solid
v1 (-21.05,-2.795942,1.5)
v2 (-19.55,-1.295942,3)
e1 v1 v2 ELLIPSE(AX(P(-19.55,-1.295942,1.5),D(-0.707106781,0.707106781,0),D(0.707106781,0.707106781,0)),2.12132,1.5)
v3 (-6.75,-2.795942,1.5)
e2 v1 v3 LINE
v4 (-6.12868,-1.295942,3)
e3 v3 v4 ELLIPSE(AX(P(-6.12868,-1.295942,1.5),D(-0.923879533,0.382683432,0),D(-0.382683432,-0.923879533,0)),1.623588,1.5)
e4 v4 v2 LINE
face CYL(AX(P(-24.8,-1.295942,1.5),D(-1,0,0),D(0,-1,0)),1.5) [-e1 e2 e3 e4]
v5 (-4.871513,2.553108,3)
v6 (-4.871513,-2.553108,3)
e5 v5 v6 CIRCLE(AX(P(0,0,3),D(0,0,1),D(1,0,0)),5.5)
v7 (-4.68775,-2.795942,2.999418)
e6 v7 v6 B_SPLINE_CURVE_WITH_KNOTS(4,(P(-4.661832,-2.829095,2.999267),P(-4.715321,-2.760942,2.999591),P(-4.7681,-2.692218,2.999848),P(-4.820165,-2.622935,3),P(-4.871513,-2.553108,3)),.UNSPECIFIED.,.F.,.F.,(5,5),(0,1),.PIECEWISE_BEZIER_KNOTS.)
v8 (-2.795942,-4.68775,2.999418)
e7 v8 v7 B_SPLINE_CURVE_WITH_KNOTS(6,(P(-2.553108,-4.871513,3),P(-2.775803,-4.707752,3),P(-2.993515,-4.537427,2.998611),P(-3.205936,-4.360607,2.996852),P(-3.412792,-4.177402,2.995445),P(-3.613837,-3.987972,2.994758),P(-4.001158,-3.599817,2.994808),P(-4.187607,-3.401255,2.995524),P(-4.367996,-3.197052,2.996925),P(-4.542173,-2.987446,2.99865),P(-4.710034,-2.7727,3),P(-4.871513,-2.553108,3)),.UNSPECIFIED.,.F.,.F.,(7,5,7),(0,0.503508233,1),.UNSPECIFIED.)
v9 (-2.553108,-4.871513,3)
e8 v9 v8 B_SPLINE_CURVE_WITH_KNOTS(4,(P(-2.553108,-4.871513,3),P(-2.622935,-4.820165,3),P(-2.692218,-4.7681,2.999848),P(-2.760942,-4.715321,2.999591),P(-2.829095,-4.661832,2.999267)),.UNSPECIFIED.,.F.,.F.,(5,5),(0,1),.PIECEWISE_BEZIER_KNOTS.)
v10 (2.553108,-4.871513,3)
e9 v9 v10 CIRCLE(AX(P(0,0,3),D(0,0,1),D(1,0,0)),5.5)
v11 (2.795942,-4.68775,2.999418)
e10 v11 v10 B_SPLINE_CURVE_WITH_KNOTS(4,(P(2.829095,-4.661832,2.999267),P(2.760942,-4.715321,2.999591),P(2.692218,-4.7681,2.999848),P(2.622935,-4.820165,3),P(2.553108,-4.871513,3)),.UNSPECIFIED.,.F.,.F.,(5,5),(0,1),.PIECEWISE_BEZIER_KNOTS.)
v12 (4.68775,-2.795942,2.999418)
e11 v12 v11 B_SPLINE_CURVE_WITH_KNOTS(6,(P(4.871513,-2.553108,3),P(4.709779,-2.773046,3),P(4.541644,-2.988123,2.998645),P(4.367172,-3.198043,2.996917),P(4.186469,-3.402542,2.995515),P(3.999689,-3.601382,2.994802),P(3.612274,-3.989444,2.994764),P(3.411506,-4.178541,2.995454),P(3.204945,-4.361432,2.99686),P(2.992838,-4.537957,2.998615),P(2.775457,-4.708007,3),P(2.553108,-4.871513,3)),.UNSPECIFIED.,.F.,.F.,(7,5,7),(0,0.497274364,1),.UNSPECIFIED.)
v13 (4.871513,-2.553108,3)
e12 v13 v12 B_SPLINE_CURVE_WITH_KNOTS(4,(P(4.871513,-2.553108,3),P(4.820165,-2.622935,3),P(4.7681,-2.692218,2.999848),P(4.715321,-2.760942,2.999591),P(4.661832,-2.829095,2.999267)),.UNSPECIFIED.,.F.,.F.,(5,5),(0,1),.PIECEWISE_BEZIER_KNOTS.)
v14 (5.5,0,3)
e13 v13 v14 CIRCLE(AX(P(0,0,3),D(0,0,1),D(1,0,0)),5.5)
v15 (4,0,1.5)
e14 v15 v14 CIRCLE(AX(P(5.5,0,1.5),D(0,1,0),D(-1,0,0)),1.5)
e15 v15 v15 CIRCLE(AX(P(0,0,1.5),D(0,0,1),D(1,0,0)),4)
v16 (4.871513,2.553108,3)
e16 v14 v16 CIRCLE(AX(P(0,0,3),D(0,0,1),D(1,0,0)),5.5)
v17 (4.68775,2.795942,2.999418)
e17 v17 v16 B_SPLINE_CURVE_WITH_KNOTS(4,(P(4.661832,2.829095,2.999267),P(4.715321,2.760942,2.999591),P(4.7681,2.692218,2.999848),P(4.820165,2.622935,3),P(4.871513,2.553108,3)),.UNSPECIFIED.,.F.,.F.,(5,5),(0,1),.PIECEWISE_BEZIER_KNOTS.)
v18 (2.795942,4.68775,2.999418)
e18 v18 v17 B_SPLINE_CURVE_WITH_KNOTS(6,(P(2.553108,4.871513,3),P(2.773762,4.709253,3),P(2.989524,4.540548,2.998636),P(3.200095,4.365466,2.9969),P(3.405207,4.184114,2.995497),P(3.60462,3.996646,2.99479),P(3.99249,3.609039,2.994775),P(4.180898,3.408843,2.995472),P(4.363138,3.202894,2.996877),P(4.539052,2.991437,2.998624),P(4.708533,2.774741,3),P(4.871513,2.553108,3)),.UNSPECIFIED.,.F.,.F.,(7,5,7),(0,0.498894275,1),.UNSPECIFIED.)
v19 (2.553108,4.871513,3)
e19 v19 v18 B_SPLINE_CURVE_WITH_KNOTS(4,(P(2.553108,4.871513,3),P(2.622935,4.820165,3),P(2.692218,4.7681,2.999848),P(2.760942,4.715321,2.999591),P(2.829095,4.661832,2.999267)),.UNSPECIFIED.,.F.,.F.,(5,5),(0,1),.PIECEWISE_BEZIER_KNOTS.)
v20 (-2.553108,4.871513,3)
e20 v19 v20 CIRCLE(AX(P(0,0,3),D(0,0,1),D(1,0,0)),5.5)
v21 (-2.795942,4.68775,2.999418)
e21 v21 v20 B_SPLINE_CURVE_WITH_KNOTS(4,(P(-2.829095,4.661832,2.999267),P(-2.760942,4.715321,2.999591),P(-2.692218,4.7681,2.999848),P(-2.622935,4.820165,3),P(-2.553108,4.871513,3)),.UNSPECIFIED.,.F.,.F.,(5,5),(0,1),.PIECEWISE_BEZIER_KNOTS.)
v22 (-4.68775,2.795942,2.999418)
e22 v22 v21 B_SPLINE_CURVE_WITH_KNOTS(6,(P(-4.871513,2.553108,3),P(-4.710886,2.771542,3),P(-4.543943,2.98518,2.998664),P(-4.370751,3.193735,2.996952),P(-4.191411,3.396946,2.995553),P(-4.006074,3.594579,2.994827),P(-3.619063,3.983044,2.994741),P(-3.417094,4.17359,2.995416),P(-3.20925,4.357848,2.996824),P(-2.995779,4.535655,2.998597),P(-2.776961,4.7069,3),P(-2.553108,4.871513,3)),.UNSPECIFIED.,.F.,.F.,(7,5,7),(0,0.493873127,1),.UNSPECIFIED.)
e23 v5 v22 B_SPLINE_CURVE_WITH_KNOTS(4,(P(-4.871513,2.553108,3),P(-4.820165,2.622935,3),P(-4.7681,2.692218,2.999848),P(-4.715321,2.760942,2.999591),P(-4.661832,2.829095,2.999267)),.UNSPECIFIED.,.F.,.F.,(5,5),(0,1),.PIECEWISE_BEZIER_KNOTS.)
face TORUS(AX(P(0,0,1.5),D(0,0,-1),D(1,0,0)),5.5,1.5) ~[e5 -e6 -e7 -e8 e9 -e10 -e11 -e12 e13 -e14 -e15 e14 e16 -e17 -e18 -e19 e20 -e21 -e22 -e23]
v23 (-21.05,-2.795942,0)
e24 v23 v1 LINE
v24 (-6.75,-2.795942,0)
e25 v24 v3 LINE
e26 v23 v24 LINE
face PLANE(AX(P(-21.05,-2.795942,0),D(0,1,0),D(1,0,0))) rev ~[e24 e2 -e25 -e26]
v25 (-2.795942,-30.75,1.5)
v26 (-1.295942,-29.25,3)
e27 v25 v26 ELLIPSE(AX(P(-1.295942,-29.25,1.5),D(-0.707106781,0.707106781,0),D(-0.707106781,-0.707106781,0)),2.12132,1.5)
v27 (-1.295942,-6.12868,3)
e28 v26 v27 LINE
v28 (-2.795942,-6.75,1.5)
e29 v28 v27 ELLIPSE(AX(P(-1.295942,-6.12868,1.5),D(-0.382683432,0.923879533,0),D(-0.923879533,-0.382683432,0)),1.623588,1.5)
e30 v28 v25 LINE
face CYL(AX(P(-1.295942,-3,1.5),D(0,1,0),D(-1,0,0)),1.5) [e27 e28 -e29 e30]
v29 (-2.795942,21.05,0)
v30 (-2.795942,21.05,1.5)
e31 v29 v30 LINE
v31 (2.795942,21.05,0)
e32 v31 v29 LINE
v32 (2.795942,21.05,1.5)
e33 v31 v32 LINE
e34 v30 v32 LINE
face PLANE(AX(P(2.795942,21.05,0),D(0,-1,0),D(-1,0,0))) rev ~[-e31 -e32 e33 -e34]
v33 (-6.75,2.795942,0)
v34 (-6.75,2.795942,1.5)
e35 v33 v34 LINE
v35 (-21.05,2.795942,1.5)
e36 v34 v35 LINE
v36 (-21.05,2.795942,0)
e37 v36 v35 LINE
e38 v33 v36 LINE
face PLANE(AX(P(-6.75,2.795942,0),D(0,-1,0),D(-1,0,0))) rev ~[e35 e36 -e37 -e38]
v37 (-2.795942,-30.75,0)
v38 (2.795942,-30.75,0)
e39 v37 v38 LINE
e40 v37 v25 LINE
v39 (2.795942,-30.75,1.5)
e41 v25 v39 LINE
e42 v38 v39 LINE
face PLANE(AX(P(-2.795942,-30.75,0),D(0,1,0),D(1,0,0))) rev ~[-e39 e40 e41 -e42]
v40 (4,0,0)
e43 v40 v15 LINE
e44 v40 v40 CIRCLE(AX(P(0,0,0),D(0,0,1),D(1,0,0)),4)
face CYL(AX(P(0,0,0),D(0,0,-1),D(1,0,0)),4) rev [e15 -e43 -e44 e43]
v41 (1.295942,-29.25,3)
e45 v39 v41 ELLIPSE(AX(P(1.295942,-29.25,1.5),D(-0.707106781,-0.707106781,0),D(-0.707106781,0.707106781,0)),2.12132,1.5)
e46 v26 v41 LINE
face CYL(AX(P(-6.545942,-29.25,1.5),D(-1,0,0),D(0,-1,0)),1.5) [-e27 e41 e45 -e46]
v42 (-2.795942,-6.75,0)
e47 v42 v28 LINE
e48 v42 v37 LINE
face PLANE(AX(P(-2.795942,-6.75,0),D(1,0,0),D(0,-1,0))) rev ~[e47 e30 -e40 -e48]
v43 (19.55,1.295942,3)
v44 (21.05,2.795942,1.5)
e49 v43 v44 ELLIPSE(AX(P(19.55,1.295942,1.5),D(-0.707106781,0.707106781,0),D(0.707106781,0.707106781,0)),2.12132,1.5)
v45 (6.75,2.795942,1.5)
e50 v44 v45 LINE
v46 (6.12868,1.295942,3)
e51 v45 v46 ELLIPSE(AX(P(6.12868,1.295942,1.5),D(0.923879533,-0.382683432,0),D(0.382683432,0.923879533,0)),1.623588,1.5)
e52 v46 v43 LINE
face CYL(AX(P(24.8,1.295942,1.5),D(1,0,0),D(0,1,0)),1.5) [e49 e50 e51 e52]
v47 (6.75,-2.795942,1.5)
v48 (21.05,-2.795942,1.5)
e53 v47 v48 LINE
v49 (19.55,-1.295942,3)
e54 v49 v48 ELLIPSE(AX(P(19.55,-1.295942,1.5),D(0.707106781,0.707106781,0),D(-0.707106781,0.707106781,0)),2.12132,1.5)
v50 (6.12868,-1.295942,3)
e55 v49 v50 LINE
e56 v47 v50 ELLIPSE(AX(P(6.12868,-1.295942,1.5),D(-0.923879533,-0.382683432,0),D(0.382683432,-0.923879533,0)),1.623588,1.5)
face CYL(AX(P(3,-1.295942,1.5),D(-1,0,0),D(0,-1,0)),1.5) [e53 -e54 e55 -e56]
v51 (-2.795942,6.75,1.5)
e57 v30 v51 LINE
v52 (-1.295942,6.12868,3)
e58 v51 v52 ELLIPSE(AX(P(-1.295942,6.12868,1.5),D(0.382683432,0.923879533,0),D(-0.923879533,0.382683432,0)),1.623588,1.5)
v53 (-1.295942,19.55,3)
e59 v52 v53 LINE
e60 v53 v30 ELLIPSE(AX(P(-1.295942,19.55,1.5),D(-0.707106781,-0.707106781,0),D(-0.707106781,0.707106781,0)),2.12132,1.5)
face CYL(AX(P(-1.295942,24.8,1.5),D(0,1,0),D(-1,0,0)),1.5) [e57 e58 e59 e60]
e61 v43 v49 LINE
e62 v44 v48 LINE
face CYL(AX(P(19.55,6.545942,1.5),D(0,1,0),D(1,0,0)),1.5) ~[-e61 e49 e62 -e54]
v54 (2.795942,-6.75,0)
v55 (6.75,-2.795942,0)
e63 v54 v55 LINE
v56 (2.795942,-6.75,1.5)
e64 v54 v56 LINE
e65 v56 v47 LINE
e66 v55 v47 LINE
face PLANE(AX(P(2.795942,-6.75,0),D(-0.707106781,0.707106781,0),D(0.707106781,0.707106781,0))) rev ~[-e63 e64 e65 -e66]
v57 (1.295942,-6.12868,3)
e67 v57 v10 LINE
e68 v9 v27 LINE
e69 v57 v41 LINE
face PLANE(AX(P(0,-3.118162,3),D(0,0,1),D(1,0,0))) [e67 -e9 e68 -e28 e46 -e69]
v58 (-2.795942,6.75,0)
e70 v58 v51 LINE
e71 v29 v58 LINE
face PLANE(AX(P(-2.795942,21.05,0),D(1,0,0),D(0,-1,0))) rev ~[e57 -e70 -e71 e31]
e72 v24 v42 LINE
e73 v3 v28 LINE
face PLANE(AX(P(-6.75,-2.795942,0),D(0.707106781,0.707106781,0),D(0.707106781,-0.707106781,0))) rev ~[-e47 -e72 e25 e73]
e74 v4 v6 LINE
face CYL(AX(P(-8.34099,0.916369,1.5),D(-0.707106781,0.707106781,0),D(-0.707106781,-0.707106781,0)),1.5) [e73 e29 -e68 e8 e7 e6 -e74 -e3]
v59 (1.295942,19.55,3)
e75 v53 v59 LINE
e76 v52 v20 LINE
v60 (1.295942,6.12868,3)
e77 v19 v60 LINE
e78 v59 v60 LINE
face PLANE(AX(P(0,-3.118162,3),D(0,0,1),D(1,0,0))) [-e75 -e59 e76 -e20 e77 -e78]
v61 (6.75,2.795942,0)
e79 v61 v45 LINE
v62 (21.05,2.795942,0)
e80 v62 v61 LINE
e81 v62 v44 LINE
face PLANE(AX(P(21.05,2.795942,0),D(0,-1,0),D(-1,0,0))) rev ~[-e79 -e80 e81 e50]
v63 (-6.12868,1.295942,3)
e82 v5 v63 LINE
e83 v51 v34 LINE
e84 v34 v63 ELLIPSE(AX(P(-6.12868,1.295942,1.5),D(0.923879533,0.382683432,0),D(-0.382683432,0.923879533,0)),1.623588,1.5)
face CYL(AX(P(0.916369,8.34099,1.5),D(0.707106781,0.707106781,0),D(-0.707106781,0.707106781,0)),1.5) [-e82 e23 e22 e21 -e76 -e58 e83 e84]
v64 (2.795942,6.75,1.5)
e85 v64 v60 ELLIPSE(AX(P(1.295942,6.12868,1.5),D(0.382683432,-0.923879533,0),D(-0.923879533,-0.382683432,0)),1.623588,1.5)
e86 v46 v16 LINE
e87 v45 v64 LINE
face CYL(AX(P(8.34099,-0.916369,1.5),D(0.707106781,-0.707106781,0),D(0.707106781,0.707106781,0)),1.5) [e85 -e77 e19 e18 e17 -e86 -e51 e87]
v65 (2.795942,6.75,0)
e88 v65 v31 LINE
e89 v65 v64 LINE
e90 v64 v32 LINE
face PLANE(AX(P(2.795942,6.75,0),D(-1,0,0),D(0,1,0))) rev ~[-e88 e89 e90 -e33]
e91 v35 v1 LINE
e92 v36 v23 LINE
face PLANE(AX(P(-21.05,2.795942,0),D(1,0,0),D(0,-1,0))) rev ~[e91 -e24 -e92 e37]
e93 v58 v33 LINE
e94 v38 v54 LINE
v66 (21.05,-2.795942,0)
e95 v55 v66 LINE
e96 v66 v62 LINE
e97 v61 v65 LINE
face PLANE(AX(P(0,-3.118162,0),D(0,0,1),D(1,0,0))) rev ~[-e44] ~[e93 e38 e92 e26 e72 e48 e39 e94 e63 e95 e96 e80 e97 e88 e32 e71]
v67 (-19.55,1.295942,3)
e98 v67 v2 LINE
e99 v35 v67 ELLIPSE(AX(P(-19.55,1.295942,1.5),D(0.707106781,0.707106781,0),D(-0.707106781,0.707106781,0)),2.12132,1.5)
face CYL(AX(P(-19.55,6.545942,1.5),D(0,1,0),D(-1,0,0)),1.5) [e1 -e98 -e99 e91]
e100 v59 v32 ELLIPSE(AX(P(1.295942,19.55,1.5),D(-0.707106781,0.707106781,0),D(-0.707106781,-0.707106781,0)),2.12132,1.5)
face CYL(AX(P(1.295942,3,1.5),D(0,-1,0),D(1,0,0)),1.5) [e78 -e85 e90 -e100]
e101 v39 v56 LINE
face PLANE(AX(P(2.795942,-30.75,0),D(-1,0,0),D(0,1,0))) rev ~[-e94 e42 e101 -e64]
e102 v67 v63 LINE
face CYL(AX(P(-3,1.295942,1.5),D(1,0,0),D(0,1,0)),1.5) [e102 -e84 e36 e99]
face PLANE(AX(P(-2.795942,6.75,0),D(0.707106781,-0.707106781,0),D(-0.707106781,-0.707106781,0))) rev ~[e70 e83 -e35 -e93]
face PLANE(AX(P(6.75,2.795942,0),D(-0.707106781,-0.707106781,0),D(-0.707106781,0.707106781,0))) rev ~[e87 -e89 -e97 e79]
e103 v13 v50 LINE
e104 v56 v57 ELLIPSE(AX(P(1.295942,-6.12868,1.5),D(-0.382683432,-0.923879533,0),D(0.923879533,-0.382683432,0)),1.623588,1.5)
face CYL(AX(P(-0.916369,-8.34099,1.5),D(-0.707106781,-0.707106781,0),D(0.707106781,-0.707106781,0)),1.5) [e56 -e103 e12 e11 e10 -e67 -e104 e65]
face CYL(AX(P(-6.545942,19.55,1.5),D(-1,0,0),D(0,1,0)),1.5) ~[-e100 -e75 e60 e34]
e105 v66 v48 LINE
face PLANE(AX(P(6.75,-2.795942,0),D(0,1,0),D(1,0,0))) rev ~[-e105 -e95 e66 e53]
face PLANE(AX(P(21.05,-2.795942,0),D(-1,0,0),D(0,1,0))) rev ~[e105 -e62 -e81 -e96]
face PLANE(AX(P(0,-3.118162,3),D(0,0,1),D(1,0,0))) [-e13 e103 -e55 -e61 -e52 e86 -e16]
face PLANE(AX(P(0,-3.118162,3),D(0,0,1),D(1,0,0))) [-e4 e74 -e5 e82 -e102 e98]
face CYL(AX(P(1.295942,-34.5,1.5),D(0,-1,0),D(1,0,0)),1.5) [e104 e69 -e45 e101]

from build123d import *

# Parameters (mm, degrees)
F0_R          = 4
F1_DEPTH      = 3
F2_T1_DEPTH   = 13.091883092
F2_T3_DEPTH   = 13.091883092
F2_T8_DEPTH   = 21.8
F2_T13_DEPTH  = 31.5
F2_T18_DEPTH  = 13.091883092
F2_T24_DEPTH  = 21.8
F2_T29_DEPTH  = 21.8
F2_T34_DEPTH  = 31.5
F2_T39_DEPTH  = 13.091883092
F2_T45_DEPTH  = 13.091883092
F2_T51_DEPTH  = 21.8
F2_T56_DEPTH  = 21.8
F2_T61_DEPTH  = 21.8
F2_T66_DEPTH  = 13.091883092
F2_T75_DEPTH  = 13.091883092
F2_T79_DEPTH  = 21.8
F2_T86_DEPTH  = 31.5
F2_T90_DEPTH  = 13.091883092
F2_T97_DEPTH  = 13.091883092
F2_T101_DEPTH = 21.8
F2_T108_DEPTH = 21.8
F2_T112_DEPTH = 13.091883092
F2_T119_DEPTH = 13.091883092
F2_T123_DEPTH = 31.5
F2_T130_DEPTH = 21.8
F2_T134_DEPTH = 13.091883092
F2_T141_DEPTH = 21.8
F2_T145_DEPTH = 13.091883092
F2_T152_DEPTH = 21.8
F2_T156_DEPTH = 13.091883092


# Not quite as in the source:
# - a fillet or chamfer that OpenCascade refuses, or shapes differently, is made with other operations: its cross-section is extruded or revolved along the edge and cut away or added


with BuildPart() as f1:
    # F0 (on Top) → F1 (new body)
    with BuildSketch(Plane.XY):
        Polygon((-6.75, -2.795941546), (-2.795941546, -6.75), (-2.795941546, -30.75), (2.795941546, -30.75), (2.795941546, -6.75), (6.75, -2.795941546), (21.05, -2.795941546), (21.05, 2.795941546), (6.75, 2.795941546), (2.795941546, 6.75), (2.795941546, 21.05), (-2.795941546, 21.05), (-2.795941546, 6.75), (-6.75, 2.795941546), (-21.05, 2.795941546), (-21.05, -2.795941546), align=None)
        Circle(F0_R, mode=Mode.SUBTRACT)
    extrude(amount=F1_DEPTH)

    # F2: fillet of radius 1.5 on 17 edges, made by hand

    # F2_s2 → F2_t1 (cut)
    with BuildSketch(Plane.XZ.offset(-6.545941546)):
        with BuildLine():
            ThreePointArc((-21.05, 1.5), (-20.6106601718, 2.5606601718), (-19.55, 3))
            Line((-19.55, 3), (-21.05, 3))
            Line((-21.05, 3), (-21.05, 1.5))
        make_face()
        with BuildLine():
            ThreePointArc((21.05, 1.5), (20.6106601718, 2.5606601718), (19.55, 3))
            Line((19.55, 3), (21.05, 3))
            Line((21.05, 3), (21.05, 1.5))
        make_face()
    extrude(amount=F2_T1_DEPTH, mode=Mode.SUBTRACT)

    # F2_s4 → F2_t3 (cut)
    with BuildSketch(Plane.YZ.offset(-6.545941546)):
        with BuildLine():
            ThreePointArc((-30.75, 1.5), (-30.3106601718, 2.5606601718), (-29.25, 3))
            Line((-29.25, 3), (-30.75, 3))
            Line((-30.75, 3), (-30.75, 1.5))
        make_face()
        with BuildLine():
            ThreePointArc((21.05, 1.5), (20.6106601718, 2.5606601718), (19.55, 3))
            Line((19.55, 3), (21.05, 3))
            Line((21.05, 3), (21.05, 1.5))
        make_face()
    extrude(amount=F2_T3_DEPTH, mode=Mode.SUBTRACT)


with BuildPart() as f2_tool6:
    # F2_s7 → F2_t8 (new body)
    with BuildSketch(Plane.YZ.offset(-3)):
        with BuildLine():
            ThreePointArc((2.795941546, 1.5), (2.3566017178, 2.5606601718), (1.295941546, 3))
            Line((1.295941546, 3), (2.795941546, 3))
            Line((2.795941546, 3), (2.795941546, 1.5))
        make_face()
    extrude(amount=-F2_T8_DEPTH)

    split(bisect_by=Plane(origin=(-4.772970773, 4.772970773, 0), x_dir=(0, 0, 1), z_dir=(-0.7071067812, 0.7071067812, 0)), keep=Keep.TOP)


with BuildPart() as f1_1:
    add(f1.part)

    # F2_t5: cut F2_tool6
    add(f2_tool6.part, mode=Mode.SUBTRACT)


with BuildPart() as f2_tool11:
    # F2_s12 → F2_t13 (new body)
    with BuildSketch(Plane.XZ.offset(34.5)):
        with BuildLine():
            ThreePointArc((2.795941546, 1.5), (2.3566017178, 2.5606601718), (1.295941546, 3))
            Line((1.295941546, 3), (2.795941546, 3))
            Line((2.795941546, 3), (2.795941546, 1.5))
        make_face()
    extrude(amount=-F2_T13_DEPTH)

    split(bisect_by=Plane(origin=(4.772970773, -4.772970773, 0), x_dir=(0, 0, 1), z_dir=(0.7071067812, -0.7071067812, 0)), keep=Keep.TOP)


with BuildPart() as f1_2:
    add(f1_1.part)

    # F2_t10: cut F2_tool11
    add(f2_tool11.part, mode=Mode.SUBTRACT)


with BuildPart() as f2_tool16:
    # F2_s17 → F2_t18 (new body)
    with BuildSketch(Plane(origin=(-4.6286796564, -4.6286796564, 0), x_dir=(0, 0, 1), z_dir=(0.7071067812, 0.7071067812, 0))):
        with BuildLine():
            ThreePointArc((1.5, 6.75), (2.5606601718, 6.3106601718), (3, 5.25))
            Line((3, 5.25), (3, 6.75))
            Line((3, 6.75), (1.5, 6.75))
        make_face()
    extrude(amount=F2_T18_DEPTH)

    split(bisect_by=Plane.YZ.offset(2.795941546), keep=Keep.TOP)

    split(bisect_by=Plane.XZ.offset(2.795941546), keep=Keep.TOP)


with BuildPart() as f1_3:
    add(f1_2.part)

    # F2_t15: cut F2_tool16
    add(f2_tool16.part, mode=Mode.SUBTRACT)


with BuildPart() as f2_tool22:
    # F2_s23 → F2_t24 (new body)
    with BuildSketch(Plane.YZ.offset(3)):
        with BuildLine():
            ThreePointArc((-2.795941546, 1.5), (-2.3566017178, 2.5606601718), (-1.295941546, 3))
            Line((-1.295941546, 3), (-2.795941546, 3))
            Line((-2.795941546, 3), (-2.795941546, 1.5))
        make_face()
    extrude(amount=F2_T24_DEPTH)

    split(bisect_by=Plane(origin=(4.772970773, -4.772970773, 0), x_dir=(0, 0, 1), z_dir=(0.7071067812, -0.7071067812, 0)), keep=Keep.TOP)


with BuildPart() as f1_4:
    add(f1_3.part)

    # F2_t21: cut F2_tool22
    add(f2_tool22.part, mode=Mode.SUBTRACT)


with BuildPart() as f2_tool27:
    # F2_s28 → F2_t29 (new body)
    with BuildSketch(Plane.YZ.offset(-24.8)):
        with BuildLine():
            ThreePointArc((-2.795941546, 1.5), (-2.3566017178, 2.5606601718), (-1.295941546, 3))
            Line((-1.295941546, 3), (-2.795941546, 3))
            Line((-2.795941546, 3), (-2.795941546, 1.5))
        make_face()
    extrude(amount=F2_T29_DEPTH)

    split(bisect_by=Plane(origin=(-4.772970773, -4.772970773, 0), x_dir=(0, 0, 1), z_dir=(-0.7071067812, -0.7071067812, 0)), keep=Keep.TOP)


with BuildPart() as f1_5:
    add(f1_4.part)

    # F2_t26: cut F2_tool27
    add(f2_tool27.part, mode=Mode.SUBTRACT)


with BuildPart() as f2_tool32:
    # F2_s33 → F2_t34 (new body)
    with BuildSketch(Plane.XZ.offset(3)):
        with BuildLine():
            ThreePointArc((-2.795941546, 1.5), (-2.3566017178, 2.5606601718), (-1.295941546, 3))
            Line((-1.295941546, 3), (-2.795941546, 3))
            Line((-2.795941546, 3), (-2.795941546, 1.5))
        make_face()
    extrude(amount=F2_T34_DEPTH)

    split(bisect_by=Plane(origin=(-4.772970773, -4.772970773, 0), x_dir=(0, 0, 1), z_dir=(-0.7071067812, -0.7071067812, 0)), keep=Keep.TOP)


with BuildPart() as f1_6:
    add(f1_5.part)

    # F2_t31: cut F2_tool32
    add(f2_tool32.part, mode=Mode.SUBTRACT)


with BuildPart() as f2_tool37:
    # F2_s38 → F2_t39 (new body)
    with BuildSketch(Plane(origin=(-4.6286796564, 4.6286796564, 0), x_dir=(0, 0, 1), z_dir=(0.7071067812, -0.7071067812, 0))):
        with BuildLine():
            ThreePointArc((1.5, 6.75), (2.5606601718, 6.3106601718), (3, 5.25))
            Line((3, 5.25), (3, 6.75))
            Line((3, 6.75), (1.5, 6.75))
        make_face()
    extrude(amount=F2_T39_DEPTH)

    split(bisect_by=Plane.XZ.offset(2.795941546), keep=Keep.TOP)

    split(bisect_by=Plane.YZ.offset(-2.795941546), keep=Keep.BOTTOM)


with BuildPart() as f1_7:
    add(f1_6.part)

    # F2_t36: cut F2_tool37
    add(f2_tool37.part, mode=Mode.SUBTRACT)


with BuildPart() as f2_tool43:
    # F2_s44 → F2_t45 (new body)
    with BuildSketch(Plane(origin=(4.6286796564, 4.6286796564, 0), x_dir=(0, 0, 1), z_dir=(-0.7071067812, -0.7071067812, 0))):
        with BuildLine():
            ThreePointArc((1.5, 6.75), (2.5606601718, 6.3106601718), (3, 5.25))
            Line((3, 5.25), (3, 6.75))
            Line((3, 6.75), (1.5, 6.75))
        make_face()
    extrude(amount=F2_T45_DEPTH)

    split(bisect_by=Plane.YZ.offset(-2.795941546), keep=Keep.BOTTOM)

    split(bisect_by=Plane.XZ.offset(-2.795941546), keep=Keep.BOTTOM)


with BuildPart() as f1_8:
    add(f1_7.part)

    # F2_t42: cut F2_tool43
    add(f2_tool43.part, mode=Mode.SUBTRACT)


with BuildPart() as f2_tool49:
    # F2_s50 → F2_t51 (new body)
    with BuildSketch(Plane.XZ.offset(-24.8)):
        with BuildLine():
            ThreePointArc((-2.795941546, 1.5), (-2.3566017178, 2.5606601718), (-1.295941546, 3))
            Line((-1.295941546, 3), (-2.795941546, 3))
            Line((-2.795941546, 3), (-2.795941546, 1.5))
        make_face()
    extrude(amount=F2_T51_DEPTH)

    split(bisect_by=Plane(origin=(-4.772970773, 4.772970773, 0), x_dir=(0, 0, 1), z_dir=(-0.7071067812, 0.7071067812, 0)), keep=Keep.TOP)


with BuildPart() as f1_9:
    add(f1_8.part)

    # F2_t48: cut F2_tool49
    add(f2_tool49.part, mode=Mode.SUBTRACT)


with BuildPart() as f2_tool54:
    # F2_s55 → F2_t56 (new body)
    with BuildSketch(Plane.XZ.offset(-3)):
        with BuildLine():
            ThreePointArc((2.795941546, 1.5), (2.3566017178, 2.5606601718), (1.295941546, 3))
            Line((1.295941546, 3), (2.795941546, 3))
            Line((2.795941546, 3), (2.795941546, 1.5))
        make_face()
    extrude(amount=-F2_T56_DEPTH)

    split(bisect_by=Plane(origin=(4.772970773, 4.772970773, 0), x_dir=(0, 0, 1), z_dir=(0.7071067812, 0.7071067812, 0)), keep=Keep.TOP)


with BuildPart() as f1_10:
    add(f1_9.part)

    # F2_t53: cut F2_tool54
    add(f2_tool54.part, mode=Mode.SUBTRACT)


with BuildPart() as f2_tool59:
    # F2_s60 → F2_t61 (new body)
    with BuildSketch(Plane.YZ.offset(24.8)):
        with BuildLine():
            ThreePointArc((2.795941546, 1.5), (2.3566017178, 2.5606601718), (1.295941546, 3))
            Line((1.295941546, 3), (2.795941546, 3))
            Line((2.795941546, 3), (2.795941546, 1.5))
        make_face()
    extrude(amount=-F2_T61_DEPTH)

    split(bisect_by=Plane(origin=(4.772970773, 4.772970773, 0), x_dir=(0, 0, 1), z_dir=(0.7071067812, 0.7071067812, 0)), keep=Keep.TOP)


with BuildPart() as f1_11:
    add(f1_10.part)

    # F2_t58: cut F2_tool59
    add(f2_tool59.part, mode=Mode.SUBTRACT)


with BuildPart() as f2_tool64:
    # F2_s65 → F2_t66 (new body)
    with BuildSketch(Plane(origin=(4.6286796564, -4.6286796564, 0), x_dir=(0, 0, 1), z_dir=(-0.7071067812, 0.7071067812, 0))):
        with BuildLine():
            ThreePointArc((1.5, 6.75), (2.5606601718, 6.3106601718), (3, 5.25))
            Line((3, 5.25), (3, 6.75))
            Line((3, 6.75), (1.5, 6.75))
        make_face()
    extrude(amount=F2_T66_DEPTH)

    split(bisect_by=Plane.YZ.offset(2.795941546), keep=Keep.TOP)

    split(bisect_by=Plane.XZ.offset(-2.795941546), keep=Keep.BOTTOM)


with BuildPart() as f1_12:
    add(f1_11.part)

    # F2_t63: cut F2_tool64
    add(f2_tool64.part, mode=Mode.SUBTRACT)

    # F2_s69 → F2_t70 (revolve, cut)
    with BuildSketch(Plane.XZ):
        with BuildLine():
            ThreePointArc((4, 1.5), (4.4393398282, 2.5606601718), (5.5, 3))
            Line((5.5, 3), (4, 3))
            Line((4, 3), (4, 1.5))
        make_face()
    revolve(axis=Axis((0, 0, 3), (0, 0, 1)), mode=Mode.SUBTRACT)


with BuildPart() as f2_tool73:
    # F2_s74 → F2_t75 (new body)
    with BuildSketch(Plane(origin=(4.6286796564, 4.6286796564, 0), x_dir=(0, 0, 1), z_dir=(-0.7071067812, -0.7071067812, 0))):
        with BuildLine():
            ThreePointArc((1.5, 6.75), (2.5606601718, 6.3106601718), (3, 5.25))
            Line((3, 5.25), (3, 6.75))
            Line((3, 6.75), (1.5, 6.75))
        make_face()
    extrude(amount=F2_T75_DEPTH)

    split(bisect_by=Plane.XZ.offset(-2.795941546), keep=Keep.TOP)


with BuildPart() as f2_tool77:
    # F2_s78 → F2_t79 (new body)
    with BuildSketch(Plane.YZ.offset(-3)):
        with BuildLine():
            ThreePointArc((2.795941546, 1.5), (2.3566017178, 2.5606601718), (1.295941546, 3))
            Line((1.295941546, 3), (2.795941546, 3))
            Line((2.795941546, 3), (2.795941546, 1.5))
        make_face()
    extrude(amount=-F2_T79_DEPTH)

    split(bisect_by=Plane(origin=(-4.772970773, 4.772970773, 0), x_dir=(0, 0, 1), z_dir=(0.7071067812, -0.7071067812, 0)), keep=Keep.TOP)


with BuildPart() as f2_tool73_1:
    add(f2_tool73.part)

    # F2_t81: intersect F2_tool77
    add(f2_tool77.part, mode=Mode.INTERSECT)


with BuildPart() as f1_13:
    add(f1_12.part)

    # F2_t71: cut F2_tool73
    add(f2_tool73_1.part, mode=Mode.SUBTRACT)


with BuildPart() as f2_tool84:
    # F2_s85 → F2_t86 (new body)
    with BuildSketch(Plane.XZ.offset(34.5)):
        with BuildLine():
            ThreePointArc((2.795941546, 1.5), (2.3566017178, 2.5606601718), (1.295941546, 3))
            Line((1.295941546, 3), (2.795941546, 3))
            Line((2.795941546, 3), (2.795941546, 1.5))
        make_face()
    extrude(amount=-F2_T86_DEPTH)

    split(bisect_by=Plane(origin=(4.772970773, -4.772970773, 0), x_dir=(0, 0, 1), z_dir=(-0.7071067812, 0.7071067812, 0)), keep=Keep.TOP)


with BuildPart() as f2_tool88:
    # F2_s89 → F2_t90 (new body)
    with BuildSketch(Plane(origin=(-4.6286796564, -4.6286796564, 0), x_dir=(0, 0, 1), z_dir=(0.7071067812, 0.7071067812, 0))):
        with BuildLine():
            ThreePointArc((1.5, 6.75), (2.5606601718, 6.3106601718), (3, 5.25))
            Line((3, 5.25), (3, 6.75))
            Line((3, 6.75), (1.5, 6.75))
        make_face()
    extrude(amount=F2_T90_DEPTH)

    split(bisect_by=Plane.YZ.offset(2.795941546), keep=Keep.BOTTOM)


with BuildPart() as f2_tool84_1:
    add(f2_tool84.part)

    # F2_t92: intersect F2_tool88
    add(f2_tool88.part, mode=Mode.INTERSECT)


with BuildPart() as f1_14:
    add(f1_13.part)

    # F2_t82: cut F2_tool84
    add(f2_tool84_1.part, mode=Mode.SUBTRACT)


with BuildPart() as f2_tool95:
    # F2_s96 → F2_t97 (new body)
    with BuildSketch(Plane(origin=(-4.6286796564, -4.6286796564, 0), x_dir=(0, 0, 1), z_dir=(0.7071067812, 0.7071067812, 0))):
        with BuildLine():
            ThreePointArc((1.5, 6.75), (2.5606601718, 6.3106601718), (3, 5.25))
            Line((3, 5.25), (3, 6.75))
            Line((3, 6.75), (1.5, 6.75))
        make_face()
    extrude(amount=F2_T97_DEPTH)

    split(bisect_by=Plane.XZ.offset(2.795941546), keep=Keep.BOTTOM)


with BuildPart() as f2_tool99:
    # F2_s100 → F2_t101 (new body)
    with BuildSketch(Plane.YZ.offset(3)):
        with BuildLine():
            ThreePointArc((-2.795941546, 1.5), (-2.3566017178, 2.5606601718), (-1.295941546, 3))
            Line((-1.295941546, 3), (-2.795941546, 3))
            Line((-2.795941546, 3), (-2.795941546, 1.5))
        make_face()
    extrude(amount=F2_T101_DEPTH)

    split(bisect_by=Plane(origin=(4.772970773, -4.772970773, 0), x_dir=(0, 0, 1), z_dir=(-0.7071067812, 0.7071067812, 0)), keep=Keep.TOP)


with BuildPart() as f2_tool95_1:
    add(f2_tool95.part)

    # F2_t103: intersect F2_tool99
    add(f2_tool99.part, mode=Mode.INTERSECT)


with BuildPart() as f1_15:
    add(f1_14.part)

    # F2_t93: cut F2_tool95
    add(f2_tool95_1.part, mode=Mode.SUBTRACT)


with BuildPart() as f2_tool106:
    # F2_s107 → F2_t108 (new body)
    with BuildSketch(Plane.YZ.offset(-24.8)):
        with BuildLine():
            ThreePointArc((-2.795941546, 1.5), (-2.3566017178, 2.5606601718), (-1.295941546, 3))
            Line((-1.295941546, 3), (-2.795941546, 3))
            Line((-2.795941546, 3), (-2.795941546, 1.5))
        make_face()
    extrude(amount=F2_T108_DEPTH)

    split(bisect_by=Plane(origin=(-4.772970773, -4.772970773, 0), x_dir=(0, 0, 1), z_dir=(0.7071067812, 0.7071067812, 0)), keep=Keep.TOP)


with BuildPart() as f2_tool110:
    # F2_s111 → F2_t112 (new body)
    with BuildSketch(Plane(origin=(-4.6286796564, 4.6286796564, 0), x_dir=(0, 0, 1), z_dir=(0.7071067812, -0.7071067812, 0))):
        with BuildLine():
            ThreePointArc((1.5, 6.75), (2.5606601718, 6.3106601718), (3, 5.25))
            Line((3, 5.25), (3, 6.75))
            Line((3, 6.75), (1.5, 6.75))
        make_face()
    extrude(amount=F2_T112_DEPTH)

    split(bisect_by=Plane.XZ.offset(2.795941546), keep=Keep.BOTTOM)


with BuildPart() as f2_tool106_1:
    add(f2_tool106.part)

    # F2_t114: intersect F2_tool110
    add(f2_tool110.part, mode=Mode.INTERSECT)


with BuildPart() as f1_16:
    add(f1_15.part)

    # F2_t104: cut F2_tool106
    add(f2_tool106_1.part, mode=Mode.SUBTRACT)


with BuildPart() as f2_tool117:
    # F2_s118 → F2_t119 (new body)
    with BuildSketch(Plane(origin=(-4.6286796564, 4.6286796564, 0), x_dir=(0, 0, 1), z_dir=(0.7071067812, -0.7071067812, 0))):
        with BuildLine():
            ThreePointArc((1.5, 6.75), (2.5606601718, 6.3106601718), (3, 5.25))
            Line((3, 5.25), (3, 6.75))
            Line((3, 6.75), (1.5, 6.75))
        make_face()
    extrude(amount=F2_T119_DEPTH)

    split(bisect_by=Plane.YZ.offset(-2.795941546), keep=Keep.TOP)


with BuildPart() as f2_tool121:
    # F2_s122 → F2_t123 (new body)
    with BuildSketch(Plane.XZ.offset(3)):
        with BuildLine():
            ThreePointArc((-2.795941546, 1.5), (-2.3566017178, 2.5606601718), (-1.295941546, 3))
            Line((-1.295941546, 3), (-2.795941546, 3))
            Line((-2.795941546, 3), (-2.795941546, 1.5))
        make_face()
    extrude(amount=F2_T123_DEPTH)

    split(bisect_by=Plane(origin=(-4.772970773, -4.772970773, 0), x_dir=(0, 0, 1), z_dir=(0.7071067812, 0.7071067812, 0)), keep=Keep.TOP)


with BuildPart() as f2_tool117_1:
    add(f2_tool117.part)

    # F2_t125: intersect F2_tool121
    add(f2_tool121.part, mode=Mode.INTERSECT)


with BuildPart() as f1_17:
    add(f1_16.part)

    # F2_t115: cut F2_tool117
    add(f2_tool117_1.part, mode=Mode.SUBTRACT)


with BuildPart() as f2_tool128:
    # F2_s129 → F2_t130 (new body)
    with BuildSketch(Plane.XZ.offset(-24.8)):
        with BuildLine():
            ThreePointArc((-2.795941546, 1.5), (-2.3566017178, 2.5606601718), (-1.295941546, 3))
            Line((-1.295941546, 3), (-2.795941546, 3))
            Line((-2.795941546, 3), (-2.795941546, 1.5))
        make_face()
    extrude(amount=F2_T130_DEPTH)

    split(bisect_by=Plane(origin=(-4.772970773, 4.772970773, 0), x_dir=(0, 0, 1), z_dir=(0.7071067812, -0.7071067812, 0)), keep=Keep.TOP)


with BuildPart() as f2_tool132:
    # F2_s133 → F2_t134 (new body)
    with BuildSketch(Plane(origin=(4.6286796564, 4.6286796564, 0), x_dir=(0, 0, 1), z_dir=(-0.7071067812, -0.7071067812, 0))):
        with BuildLine():
            ThreePointArc((1.5, 6.75), (2.5606601718, 6.3106601718), (3, 5.25))
            Line((3, 5.25), (3, 6.75))
            Line((3, 6.75), (1.5, 6.75))
        make_face()
    extrude(amount=F2_T134_DEPTH)

    split(bisect_by=Plane.YZ.offset(-2.795941546), keep=Keep.TOP)


with BuildPart() as f2_tool128_1:
    add(f2_tool128.part)

    # F2_t136: intersect F2_tool132
    add(f2_tool132.part, mode=Mode.INTERSECT)


with BuildPart() as f1_18:
    add(f1_17.part)

    # F2_t126: cut F2_tool128
    add(f2_tool128_1.part, mode=Mode.SUBTRACT)


with BuildPart() as f2_tool139:
    # F2_s140 → F2_t141 (new body)
    with BuildSketch(Plane.XZ.offset(-3)):
        with BuildLine():
            ThreePointArc((2.795941546, 1.5), (2.3566017178, 2.5606601718), (1.295941546, 3))
            Line((1.295941546, 3), (2.795941546, 3))
            Line((2.795941546, 3), (2.795941546, 1.5))
        make_face()
    extrude(amount=-F2_T141_DEPTH)

    split(bisect_by=Plane(origin=(4.772970773, 4.772970773, 0), x_dir=(0, 0, 1), z_dir=(-0.7071067812, -0.7071067812, 0)), keep=Keep.TOP)


with BuildPart() as f2_tool143:
    # F2_s144 → F2_t145 (new body)
    with BuildSketch(Plane(origin=(4.6286796564, -4.6286796564, 0), x_dir=(0, 0, 1), z_dir=(-0.7071067812, 0.7071067812, 0))):
        with BuildLine():
            ThreePointArc((1.5, 6.75), (2.5606601718, 6.3106601718), (3, 5.25))
            Line((3, 5.25), (3, 6.75))
            Line((3, 6.75), (1.5, 6.75))
        make_face()
    extrude(amount=F2_T145_DEPTH)

    split(bisect_by=Plane.YZ.offset(2.795941546), keep=Keep.BOTTOM)


with BuildPart() as f2_tool139_1:
    add(f2_tool139.part)

    # F2_t147: intersect F2_tool143
    add(f2_tool143.part, mode=Mode.INTERSECT)


with BuildPart() as f1_19:
    add(f1_18.part)

    # F2_t137: cut F2_tool139
    add(f2_tool139_1.part, mode=Mode.SUBTRACT)


with BuildPart() as f2_tool150:
    # F2_s151 → F2_t152 (new body)
    with BuildSketch(Plane.YZ.offset(24.8)):
        with BuildLine():
            ThreePointArc((2.795941546, 1.5), (2.3566017178, 2.5606601718), (1.295941546, 3))
            Line((1.295941546, 3), (2.795941546, 3))
            Line((2.795941546, 3), (2.795941546, 1.5))
        make_face()
    extrude(amount=-F2_T152_DEPTH)

    split(bisect_by=Plane(origin=(4.772970773, 4.772970773, 0), x_dir=(0, 0, 1), z_dir=(-0.7071067812, -0.7071067812, 0)), keep=Keep.TOP)


with BuildPart() as f2_tool154:
    # F2_s155 → F2_t156 (new body)
    with BuildSketch(Plane(origin=(4.6286796564, -4.6286796564, 0), x_dir=(0, 0, 1), z_dir=(-0.7071067812, 0.7071067812, 0))):
        with BuildLine():
            ThreePointArc((1.5, 6.75), (2.5606601718, 6.3106601718), (3, 5.25))
            Line((3, 5.25), (3, 6.75))
            Line((3, 6.75), (1.5, 6.75))
        make_face()
    extrude(amount=F2_T156_DEPTH)

    split(bisect_by=Plane.XZ.offset(-2.795941546), keep=Keep.TOP)


with BuildPart() as f2_tool150_1:
    add(f2_tool150.part)

    # F2_t158: intersect F2_tool154
    add(f2_tool154.part, mode=Mode.INTERSECT)


with BuildPart() as f1_20:
    add(f1_19.part)

    # F2_t148: cut F2_tool150
    add(f2_tool150_1.part, mode=Mode.SUBTRACT)


solid = f1_20.part
